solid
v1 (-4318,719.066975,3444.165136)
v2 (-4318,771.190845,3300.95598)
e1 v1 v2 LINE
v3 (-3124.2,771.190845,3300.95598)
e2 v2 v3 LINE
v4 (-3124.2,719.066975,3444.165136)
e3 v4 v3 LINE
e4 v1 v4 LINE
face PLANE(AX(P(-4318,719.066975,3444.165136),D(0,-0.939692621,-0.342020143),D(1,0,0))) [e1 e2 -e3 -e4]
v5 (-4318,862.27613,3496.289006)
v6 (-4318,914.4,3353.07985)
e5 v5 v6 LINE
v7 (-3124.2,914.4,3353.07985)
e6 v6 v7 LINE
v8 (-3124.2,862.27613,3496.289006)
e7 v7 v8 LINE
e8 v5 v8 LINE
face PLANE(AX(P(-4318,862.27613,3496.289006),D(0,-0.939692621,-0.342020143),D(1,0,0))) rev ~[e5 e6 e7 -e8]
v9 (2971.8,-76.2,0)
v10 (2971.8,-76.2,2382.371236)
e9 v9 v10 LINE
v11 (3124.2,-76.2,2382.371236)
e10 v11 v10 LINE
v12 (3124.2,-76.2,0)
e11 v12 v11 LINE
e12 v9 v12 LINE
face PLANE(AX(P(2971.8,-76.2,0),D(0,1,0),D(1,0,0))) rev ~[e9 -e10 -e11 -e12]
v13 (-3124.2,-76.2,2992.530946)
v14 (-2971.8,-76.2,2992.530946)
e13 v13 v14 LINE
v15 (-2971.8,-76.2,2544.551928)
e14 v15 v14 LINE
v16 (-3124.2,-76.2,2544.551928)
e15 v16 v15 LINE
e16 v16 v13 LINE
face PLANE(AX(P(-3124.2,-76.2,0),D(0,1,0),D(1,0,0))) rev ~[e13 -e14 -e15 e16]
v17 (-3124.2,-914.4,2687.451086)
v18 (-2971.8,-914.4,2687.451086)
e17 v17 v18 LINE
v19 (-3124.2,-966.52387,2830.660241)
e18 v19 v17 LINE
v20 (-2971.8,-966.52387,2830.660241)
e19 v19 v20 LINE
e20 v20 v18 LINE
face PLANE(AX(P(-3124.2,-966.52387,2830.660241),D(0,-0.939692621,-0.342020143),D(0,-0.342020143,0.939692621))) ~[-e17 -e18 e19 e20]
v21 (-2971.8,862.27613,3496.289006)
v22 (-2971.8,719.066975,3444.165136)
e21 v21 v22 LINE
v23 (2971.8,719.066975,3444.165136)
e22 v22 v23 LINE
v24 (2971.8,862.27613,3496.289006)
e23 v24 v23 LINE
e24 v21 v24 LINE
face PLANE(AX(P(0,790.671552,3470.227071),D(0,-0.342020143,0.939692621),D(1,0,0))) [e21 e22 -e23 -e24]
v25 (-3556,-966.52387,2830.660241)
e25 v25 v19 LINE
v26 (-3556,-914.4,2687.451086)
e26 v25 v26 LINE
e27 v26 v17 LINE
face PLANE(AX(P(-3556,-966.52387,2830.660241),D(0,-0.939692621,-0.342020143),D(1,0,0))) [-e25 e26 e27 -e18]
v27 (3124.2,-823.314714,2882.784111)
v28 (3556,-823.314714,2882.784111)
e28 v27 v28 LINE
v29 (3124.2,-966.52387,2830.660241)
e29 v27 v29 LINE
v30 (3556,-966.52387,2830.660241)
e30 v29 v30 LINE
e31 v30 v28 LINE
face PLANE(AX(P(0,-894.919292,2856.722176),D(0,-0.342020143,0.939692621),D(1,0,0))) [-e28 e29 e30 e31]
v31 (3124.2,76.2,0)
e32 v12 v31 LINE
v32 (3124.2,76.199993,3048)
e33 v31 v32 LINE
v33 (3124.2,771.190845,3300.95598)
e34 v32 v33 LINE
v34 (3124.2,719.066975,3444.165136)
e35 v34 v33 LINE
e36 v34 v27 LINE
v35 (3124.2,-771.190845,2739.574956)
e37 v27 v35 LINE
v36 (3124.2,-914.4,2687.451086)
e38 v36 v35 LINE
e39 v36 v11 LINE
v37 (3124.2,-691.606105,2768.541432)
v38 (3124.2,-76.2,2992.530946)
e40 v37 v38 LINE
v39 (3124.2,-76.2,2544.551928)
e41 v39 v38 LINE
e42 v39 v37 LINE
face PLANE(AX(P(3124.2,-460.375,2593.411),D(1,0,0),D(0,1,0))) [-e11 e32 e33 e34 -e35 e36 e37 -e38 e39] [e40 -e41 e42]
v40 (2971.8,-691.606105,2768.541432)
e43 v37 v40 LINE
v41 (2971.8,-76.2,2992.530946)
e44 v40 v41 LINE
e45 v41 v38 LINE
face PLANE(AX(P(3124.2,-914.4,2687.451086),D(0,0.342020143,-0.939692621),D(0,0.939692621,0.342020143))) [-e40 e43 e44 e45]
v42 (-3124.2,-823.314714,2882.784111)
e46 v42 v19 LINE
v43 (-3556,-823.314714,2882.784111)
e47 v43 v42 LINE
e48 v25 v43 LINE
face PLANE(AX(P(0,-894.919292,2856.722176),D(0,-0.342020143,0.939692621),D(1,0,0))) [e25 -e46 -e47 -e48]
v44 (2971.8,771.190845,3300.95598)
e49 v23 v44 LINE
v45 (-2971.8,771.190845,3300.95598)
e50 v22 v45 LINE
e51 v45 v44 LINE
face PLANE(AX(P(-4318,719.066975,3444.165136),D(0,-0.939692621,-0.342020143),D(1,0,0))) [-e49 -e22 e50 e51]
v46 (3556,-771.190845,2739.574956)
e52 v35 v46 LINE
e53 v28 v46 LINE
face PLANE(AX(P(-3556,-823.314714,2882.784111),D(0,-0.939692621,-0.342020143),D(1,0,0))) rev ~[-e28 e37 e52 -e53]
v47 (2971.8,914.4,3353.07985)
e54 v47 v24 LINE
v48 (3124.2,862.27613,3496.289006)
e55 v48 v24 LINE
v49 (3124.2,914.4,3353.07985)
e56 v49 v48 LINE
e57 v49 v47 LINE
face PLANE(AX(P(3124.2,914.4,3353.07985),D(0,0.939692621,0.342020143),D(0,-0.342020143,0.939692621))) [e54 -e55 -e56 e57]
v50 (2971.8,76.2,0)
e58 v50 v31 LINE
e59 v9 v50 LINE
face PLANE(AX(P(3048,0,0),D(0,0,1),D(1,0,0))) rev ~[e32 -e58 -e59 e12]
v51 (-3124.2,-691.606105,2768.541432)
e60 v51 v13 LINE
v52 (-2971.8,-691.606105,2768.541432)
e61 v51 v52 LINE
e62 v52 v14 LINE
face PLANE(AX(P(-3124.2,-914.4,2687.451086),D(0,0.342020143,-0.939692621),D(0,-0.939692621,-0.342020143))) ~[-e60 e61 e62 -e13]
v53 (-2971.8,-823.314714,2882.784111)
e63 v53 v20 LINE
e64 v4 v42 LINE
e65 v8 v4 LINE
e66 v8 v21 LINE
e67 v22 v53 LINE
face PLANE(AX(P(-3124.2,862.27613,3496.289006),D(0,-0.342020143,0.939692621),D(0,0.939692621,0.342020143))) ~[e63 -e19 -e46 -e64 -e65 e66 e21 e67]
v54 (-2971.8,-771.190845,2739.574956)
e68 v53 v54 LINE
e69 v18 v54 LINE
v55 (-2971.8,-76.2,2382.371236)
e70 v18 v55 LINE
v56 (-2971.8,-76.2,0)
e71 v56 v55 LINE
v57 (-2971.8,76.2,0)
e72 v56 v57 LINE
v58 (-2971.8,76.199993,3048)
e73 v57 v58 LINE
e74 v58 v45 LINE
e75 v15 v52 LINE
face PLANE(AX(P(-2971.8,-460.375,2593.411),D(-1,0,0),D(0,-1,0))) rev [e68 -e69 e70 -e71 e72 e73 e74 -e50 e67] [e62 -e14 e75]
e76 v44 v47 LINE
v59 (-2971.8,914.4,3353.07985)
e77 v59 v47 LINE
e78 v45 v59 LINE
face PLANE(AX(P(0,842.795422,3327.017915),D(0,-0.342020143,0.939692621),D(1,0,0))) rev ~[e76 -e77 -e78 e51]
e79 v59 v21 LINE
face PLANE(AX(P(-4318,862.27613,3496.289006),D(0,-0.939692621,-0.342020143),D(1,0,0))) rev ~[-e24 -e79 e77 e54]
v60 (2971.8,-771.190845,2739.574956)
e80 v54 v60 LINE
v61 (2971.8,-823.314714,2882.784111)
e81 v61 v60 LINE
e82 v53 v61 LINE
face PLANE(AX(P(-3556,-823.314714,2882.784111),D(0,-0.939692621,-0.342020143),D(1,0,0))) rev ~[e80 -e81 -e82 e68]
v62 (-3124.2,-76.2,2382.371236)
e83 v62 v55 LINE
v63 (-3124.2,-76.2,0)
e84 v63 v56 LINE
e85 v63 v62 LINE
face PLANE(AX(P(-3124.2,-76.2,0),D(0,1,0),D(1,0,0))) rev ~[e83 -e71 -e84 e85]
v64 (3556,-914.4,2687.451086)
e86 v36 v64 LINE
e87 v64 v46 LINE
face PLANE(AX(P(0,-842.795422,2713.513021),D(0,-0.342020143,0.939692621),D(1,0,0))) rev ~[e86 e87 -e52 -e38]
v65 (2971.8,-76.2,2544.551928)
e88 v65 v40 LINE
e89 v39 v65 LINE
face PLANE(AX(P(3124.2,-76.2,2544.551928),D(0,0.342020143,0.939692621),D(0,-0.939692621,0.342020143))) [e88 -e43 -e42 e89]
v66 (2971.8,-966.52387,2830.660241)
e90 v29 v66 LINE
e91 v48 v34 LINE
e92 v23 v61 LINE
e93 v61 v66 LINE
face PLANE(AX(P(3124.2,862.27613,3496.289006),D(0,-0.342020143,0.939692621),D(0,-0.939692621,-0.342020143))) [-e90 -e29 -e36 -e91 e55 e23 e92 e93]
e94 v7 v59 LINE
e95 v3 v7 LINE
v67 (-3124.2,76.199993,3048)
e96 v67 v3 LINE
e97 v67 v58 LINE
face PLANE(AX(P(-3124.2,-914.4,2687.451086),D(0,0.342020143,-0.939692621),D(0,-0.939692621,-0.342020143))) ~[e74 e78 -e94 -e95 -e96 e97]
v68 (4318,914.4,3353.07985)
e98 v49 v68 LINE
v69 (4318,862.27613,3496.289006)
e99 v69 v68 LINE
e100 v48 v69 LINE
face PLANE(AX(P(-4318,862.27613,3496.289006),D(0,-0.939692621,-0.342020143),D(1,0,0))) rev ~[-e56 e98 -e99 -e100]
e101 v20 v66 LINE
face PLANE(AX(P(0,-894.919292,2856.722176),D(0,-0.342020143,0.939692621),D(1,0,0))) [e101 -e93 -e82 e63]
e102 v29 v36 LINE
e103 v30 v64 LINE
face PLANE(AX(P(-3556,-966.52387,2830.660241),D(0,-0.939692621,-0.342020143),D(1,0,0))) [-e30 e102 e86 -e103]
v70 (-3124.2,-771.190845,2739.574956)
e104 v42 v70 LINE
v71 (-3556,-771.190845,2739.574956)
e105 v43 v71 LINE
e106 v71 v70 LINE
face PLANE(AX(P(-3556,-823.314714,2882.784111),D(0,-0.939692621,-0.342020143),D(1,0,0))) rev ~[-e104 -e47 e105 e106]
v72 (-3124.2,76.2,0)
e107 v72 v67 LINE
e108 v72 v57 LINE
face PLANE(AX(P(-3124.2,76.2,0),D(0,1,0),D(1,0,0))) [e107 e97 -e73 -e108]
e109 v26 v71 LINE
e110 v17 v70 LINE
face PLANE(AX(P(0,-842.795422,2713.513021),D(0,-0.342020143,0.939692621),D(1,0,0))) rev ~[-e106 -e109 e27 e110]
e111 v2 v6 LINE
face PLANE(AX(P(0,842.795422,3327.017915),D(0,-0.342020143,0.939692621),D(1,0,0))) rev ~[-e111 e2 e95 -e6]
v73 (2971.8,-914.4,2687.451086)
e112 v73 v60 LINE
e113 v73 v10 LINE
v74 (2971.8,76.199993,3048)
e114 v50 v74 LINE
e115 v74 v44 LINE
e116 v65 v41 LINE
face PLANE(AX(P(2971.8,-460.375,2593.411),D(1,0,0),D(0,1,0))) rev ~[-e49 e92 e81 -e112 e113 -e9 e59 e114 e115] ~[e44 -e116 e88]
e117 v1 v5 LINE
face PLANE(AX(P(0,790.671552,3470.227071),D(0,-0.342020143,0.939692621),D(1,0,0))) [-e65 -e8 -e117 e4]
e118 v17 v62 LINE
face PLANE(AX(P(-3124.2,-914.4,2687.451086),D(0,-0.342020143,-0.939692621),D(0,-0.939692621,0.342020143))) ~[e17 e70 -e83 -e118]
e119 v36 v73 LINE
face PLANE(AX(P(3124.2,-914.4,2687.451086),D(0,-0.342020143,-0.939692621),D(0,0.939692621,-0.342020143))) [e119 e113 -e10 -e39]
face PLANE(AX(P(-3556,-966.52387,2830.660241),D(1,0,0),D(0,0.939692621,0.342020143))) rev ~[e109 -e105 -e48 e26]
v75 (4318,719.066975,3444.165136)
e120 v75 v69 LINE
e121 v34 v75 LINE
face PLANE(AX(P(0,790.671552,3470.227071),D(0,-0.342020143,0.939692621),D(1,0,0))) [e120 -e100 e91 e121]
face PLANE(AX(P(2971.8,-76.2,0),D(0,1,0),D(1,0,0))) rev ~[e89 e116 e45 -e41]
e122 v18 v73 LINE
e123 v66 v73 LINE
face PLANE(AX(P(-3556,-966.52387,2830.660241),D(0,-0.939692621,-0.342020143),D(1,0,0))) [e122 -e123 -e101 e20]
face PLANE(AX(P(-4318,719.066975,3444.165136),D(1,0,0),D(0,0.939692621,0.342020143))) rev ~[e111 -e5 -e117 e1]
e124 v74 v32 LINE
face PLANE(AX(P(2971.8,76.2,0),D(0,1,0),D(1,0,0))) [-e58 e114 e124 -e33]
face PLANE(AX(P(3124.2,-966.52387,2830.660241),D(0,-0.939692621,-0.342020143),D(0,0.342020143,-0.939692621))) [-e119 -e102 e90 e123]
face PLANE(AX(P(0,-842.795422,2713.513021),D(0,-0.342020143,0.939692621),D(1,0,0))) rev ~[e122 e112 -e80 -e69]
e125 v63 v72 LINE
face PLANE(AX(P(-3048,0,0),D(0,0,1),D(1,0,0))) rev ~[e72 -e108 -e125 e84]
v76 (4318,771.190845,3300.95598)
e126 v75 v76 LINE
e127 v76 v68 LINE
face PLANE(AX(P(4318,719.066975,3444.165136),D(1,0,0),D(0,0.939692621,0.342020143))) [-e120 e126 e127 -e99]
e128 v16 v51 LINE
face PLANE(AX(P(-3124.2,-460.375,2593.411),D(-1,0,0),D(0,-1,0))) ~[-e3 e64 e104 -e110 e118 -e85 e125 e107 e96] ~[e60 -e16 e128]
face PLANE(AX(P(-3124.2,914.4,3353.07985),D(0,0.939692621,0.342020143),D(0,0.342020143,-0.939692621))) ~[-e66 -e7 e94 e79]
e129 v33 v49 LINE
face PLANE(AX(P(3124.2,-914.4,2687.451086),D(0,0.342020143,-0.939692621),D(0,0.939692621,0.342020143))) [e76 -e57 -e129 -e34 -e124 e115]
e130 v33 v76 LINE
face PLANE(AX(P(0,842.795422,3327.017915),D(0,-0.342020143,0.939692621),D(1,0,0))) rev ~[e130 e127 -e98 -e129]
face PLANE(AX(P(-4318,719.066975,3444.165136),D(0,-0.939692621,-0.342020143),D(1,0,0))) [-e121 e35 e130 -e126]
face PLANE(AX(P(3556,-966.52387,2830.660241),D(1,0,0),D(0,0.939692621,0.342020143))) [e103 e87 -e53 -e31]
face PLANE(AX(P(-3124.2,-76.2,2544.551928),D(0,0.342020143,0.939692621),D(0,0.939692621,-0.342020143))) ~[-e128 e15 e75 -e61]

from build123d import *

# Parameters (mm, degrees)
F0_W      = 152.4
F0_H      = 152.4
F1_DEPTH  = 3048
F2_SIZE2  = 55.469054
F2_SIZE   = 152.39999
F3_SIZE2  = 55.469054
F3_SIZE   = 152.39999
F5_DEPTH  = 152.4
F7_W      = 7112
F7_H      = 152.4
F7_W_2    = 8636
F8_DEPTH  = 152.4
F11_DEPTH = 152.4


# Not quite as in the source:
# - a fillet or chamfer is up to 0.001 mm smaller than in the source, because OpenCascade refuses the exact size


with BuildPart() as f1:
    # F0 (on Top) → F1 (new body)
    with BuildSketch(Plane.XY):
        with Locations((-3048, 0)):
            Rectangle(F0_W, F0_H)
    extrude(amount=F1_DEPTH)

    # F3 (size 152.4 and 55.4690637022 in the source; OpenCascade refuses exactly that, so slightly less here)
    f3_edges = [f1.edges().sort_by_distance(p)[0] for p in [
        (-3048, -76.2, 3048),
    ]]
    f3_side = f1.faces().sort_by_distance((-3048, 0, 3048))[0]
    chamfer(f3_edges, length=F3_SIZE, length2=F3_SIZE2, reference=f3_side)

    # F6: F1b across plane


with BuildPart() as f1b:
    # F0 (on Top) → F1, piece 2 (new body)
    with BuildSketch(Plane.XY):
        with Locations((3048, 0)):
            Rectangle(F0_W, F0_H)
    extrude(amount=F1_DEPTH)

    # F2 (size 152.4 and 55.4690637022 in the source; OpenCascade refuses exactly that, so slightly less here)
    f2_edges = [f1b.edges().sort_by_distance(p)[0] for p in [
        (3048, -76.2, 3048),
    ]]
    f2_side = f1b.faces().sort_by_distance((3048, 0, 3048))[0]
    chamfer(f2_edges, length=F2_SIZE, length2=F2_SIZE2, reference=f2_side)

    # F4 (on face) → F5 (join)
    with BuildSketch(Plane.YZ.offset(3124.2)):
        Polygon((-966.5238698428, 2830.6602413437), (-914.4, 2687.4510859359), (-76.1999968818, 2992.5309374328), (76.1999955849, 3047.999998393), (914.4, 3353.0798503619), (862.2761301572, 3496.2890057697), align=None)
    extrude(amount=-F5_DEPTH)


with BuildPart() as f1_1:
    add(f1.part)
    add(f1b.part.mirror(Plane.YZ))


    add(f1b.part)  # F8 merges F1b
    # F7 (on face) → F8 (join)
    with BuildSketch(Plane(origin=(0, -1022.818480288, 2810.170678792), x_dir=(1, 0, 0), z_dir=(0, -0.3420201433, 0.9396926208))):
        with Locations((0, 136.1074731459)):
            Rectangle(F7_W, F7_H)
        with Locations((0, 1929.8757834498)):
            Rectangle(F7_W_2, F7_H)
    extrude(amount=-F8_DEPTH)

    # F9: union 

    # F10 (on face) → F11 (join)
    with BuildSketch(Plane.YZ.offset(3124.2)):
        Polygon((-771.1908445922, 2739.5749557787), (-914.4, 2687.4510859359), (-76.2, 2382.371235574), (-76.2, 2544.5519280993), (-691.6061047076, 2768.5414321986), align=None)
    extrude(amount=-F11_DEPTH)

    # F12: F1 across plane


with BuildPart() as f1_2:
    add(f1_1.part)
    add(f1_1.part.mirror(Plane.YZ))


solid = f1_2.part
